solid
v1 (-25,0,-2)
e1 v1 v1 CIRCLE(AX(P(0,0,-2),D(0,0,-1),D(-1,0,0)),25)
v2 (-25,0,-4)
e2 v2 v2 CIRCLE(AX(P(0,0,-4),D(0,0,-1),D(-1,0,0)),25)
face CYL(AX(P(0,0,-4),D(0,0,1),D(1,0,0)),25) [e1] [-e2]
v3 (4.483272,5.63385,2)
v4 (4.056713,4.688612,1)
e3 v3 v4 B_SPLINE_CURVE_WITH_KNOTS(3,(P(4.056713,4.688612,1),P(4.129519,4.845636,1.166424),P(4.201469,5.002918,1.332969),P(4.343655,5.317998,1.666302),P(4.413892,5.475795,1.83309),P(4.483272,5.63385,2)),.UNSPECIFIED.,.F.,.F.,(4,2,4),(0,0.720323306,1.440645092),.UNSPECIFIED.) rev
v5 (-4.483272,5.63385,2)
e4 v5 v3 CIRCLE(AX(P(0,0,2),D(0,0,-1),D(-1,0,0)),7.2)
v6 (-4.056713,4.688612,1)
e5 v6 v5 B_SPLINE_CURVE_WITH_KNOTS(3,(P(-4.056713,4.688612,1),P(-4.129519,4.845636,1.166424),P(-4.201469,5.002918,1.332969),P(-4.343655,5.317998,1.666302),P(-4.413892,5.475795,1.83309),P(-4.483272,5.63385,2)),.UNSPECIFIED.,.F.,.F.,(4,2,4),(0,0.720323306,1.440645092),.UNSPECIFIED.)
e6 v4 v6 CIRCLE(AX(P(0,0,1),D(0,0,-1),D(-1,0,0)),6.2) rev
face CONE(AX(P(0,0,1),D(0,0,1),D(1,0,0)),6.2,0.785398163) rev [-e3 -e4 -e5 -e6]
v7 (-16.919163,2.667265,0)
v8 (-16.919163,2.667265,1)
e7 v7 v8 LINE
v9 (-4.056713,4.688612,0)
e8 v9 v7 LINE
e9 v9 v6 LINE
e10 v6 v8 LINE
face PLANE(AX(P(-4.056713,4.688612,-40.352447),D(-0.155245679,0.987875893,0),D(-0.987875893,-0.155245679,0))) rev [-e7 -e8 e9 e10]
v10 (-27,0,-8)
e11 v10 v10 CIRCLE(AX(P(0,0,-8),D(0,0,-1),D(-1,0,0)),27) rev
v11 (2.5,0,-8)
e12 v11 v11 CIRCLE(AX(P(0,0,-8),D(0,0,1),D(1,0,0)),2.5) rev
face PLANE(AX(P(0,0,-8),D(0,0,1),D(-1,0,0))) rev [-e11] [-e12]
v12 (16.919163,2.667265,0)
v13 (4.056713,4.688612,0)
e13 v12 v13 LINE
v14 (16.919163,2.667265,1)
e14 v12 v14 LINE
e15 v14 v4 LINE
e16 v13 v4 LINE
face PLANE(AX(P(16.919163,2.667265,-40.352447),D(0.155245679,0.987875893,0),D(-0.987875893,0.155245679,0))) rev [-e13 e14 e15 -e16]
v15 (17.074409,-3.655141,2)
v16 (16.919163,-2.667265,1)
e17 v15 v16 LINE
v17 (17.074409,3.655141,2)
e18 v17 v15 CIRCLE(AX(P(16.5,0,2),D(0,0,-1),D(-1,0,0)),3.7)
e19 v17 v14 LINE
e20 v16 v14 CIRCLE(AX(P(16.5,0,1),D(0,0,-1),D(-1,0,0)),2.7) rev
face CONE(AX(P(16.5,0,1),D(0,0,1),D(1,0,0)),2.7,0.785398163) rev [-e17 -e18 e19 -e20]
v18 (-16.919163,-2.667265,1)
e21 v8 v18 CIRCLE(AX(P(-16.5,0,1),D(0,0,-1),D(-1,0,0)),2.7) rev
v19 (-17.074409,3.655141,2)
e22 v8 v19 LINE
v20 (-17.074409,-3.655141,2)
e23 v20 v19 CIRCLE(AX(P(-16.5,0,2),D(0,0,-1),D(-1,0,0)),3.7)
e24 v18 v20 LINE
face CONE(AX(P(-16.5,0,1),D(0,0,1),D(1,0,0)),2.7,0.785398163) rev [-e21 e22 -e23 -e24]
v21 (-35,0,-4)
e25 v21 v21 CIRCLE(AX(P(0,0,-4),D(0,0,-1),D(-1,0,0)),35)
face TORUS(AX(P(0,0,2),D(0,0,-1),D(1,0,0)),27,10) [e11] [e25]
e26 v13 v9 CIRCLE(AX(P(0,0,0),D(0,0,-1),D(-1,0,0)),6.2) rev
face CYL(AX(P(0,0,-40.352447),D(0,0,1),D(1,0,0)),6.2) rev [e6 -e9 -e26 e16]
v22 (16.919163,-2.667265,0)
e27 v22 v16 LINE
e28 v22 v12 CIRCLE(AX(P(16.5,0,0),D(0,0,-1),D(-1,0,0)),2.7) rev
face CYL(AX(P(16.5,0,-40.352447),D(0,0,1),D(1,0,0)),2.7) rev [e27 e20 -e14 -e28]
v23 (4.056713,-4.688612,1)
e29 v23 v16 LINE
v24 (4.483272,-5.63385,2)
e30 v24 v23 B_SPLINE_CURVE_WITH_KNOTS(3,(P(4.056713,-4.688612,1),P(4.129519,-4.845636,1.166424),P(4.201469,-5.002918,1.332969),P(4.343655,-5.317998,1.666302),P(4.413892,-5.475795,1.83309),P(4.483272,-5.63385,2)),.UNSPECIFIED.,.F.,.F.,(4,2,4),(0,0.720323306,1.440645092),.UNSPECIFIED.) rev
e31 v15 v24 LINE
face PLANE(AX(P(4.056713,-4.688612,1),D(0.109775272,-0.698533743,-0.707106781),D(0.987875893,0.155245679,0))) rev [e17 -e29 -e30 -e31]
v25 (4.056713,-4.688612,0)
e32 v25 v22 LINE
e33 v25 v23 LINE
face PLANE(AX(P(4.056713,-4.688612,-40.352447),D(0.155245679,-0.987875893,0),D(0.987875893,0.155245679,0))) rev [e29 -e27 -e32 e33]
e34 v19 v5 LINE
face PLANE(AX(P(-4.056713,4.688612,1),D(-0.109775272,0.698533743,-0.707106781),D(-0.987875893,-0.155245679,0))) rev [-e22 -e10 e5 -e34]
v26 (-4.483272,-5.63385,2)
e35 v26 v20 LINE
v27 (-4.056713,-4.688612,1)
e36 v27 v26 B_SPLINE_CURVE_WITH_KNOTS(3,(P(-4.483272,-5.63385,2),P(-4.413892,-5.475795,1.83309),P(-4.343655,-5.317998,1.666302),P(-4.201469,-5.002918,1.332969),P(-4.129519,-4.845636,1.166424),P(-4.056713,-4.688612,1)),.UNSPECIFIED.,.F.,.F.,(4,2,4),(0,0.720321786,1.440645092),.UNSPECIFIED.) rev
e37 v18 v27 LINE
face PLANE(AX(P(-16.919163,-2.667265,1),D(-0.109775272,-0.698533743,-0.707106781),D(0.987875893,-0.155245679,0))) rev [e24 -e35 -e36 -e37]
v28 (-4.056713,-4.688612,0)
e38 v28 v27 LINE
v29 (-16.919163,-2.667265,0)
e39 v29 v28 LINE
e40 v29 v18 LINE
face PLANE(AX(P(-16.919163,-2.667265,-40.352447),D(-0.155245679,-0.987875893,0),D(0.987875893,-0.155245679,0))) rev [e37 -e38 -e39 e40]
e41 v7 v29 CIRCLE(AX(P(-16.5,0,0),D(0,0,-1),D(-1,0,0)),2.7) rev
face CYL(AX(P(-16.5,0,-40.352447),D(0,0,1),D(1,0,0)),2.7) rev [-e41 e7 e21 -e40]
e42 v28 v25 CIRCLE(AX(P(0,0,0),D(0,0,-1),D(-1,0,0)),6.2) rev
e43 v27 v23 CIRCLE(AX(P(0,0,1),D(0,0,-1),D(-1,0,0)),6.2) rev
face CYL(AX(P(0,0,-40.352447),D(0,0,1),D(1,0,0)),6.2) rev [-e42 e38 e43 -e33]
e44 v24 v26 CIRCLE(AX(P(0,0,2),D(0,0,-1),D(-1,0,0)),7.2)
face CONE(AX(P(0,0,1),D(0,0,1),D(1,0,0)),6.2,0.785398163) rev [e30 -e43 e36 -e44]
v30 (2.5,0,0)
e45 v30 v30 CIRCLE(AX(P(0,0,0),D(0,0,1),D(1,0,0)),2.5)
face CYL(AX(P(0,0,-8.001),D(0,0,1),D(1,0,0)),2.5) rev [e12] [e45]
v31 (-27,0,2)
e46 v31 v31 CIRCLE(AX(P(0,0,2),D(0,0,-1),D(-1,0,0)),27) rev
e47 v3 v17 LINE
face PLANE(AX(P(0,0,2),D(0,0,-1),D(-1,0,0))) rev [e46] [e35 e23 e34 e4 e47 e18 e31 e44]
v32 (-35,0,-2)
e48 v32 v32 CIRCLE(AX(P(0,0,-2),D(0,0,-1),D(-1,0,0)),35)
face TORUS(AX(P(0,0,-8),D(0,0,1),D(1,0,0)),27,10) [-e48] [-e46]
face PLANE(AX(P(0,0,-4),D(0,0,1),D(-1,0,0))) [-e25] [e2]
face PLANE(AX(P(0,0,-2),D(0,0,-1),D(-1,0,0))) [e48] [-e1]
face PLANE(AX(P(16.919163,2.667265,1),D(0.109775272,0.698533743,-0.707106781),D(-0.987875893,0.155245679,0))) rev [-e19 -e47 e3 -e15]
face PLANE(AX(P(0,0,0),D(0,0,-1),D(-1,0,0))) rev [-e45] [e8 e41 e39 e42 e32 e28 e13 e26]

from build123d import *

# Parameters (mm, degrees)
SKETCH_1_R               = 1.5
EXTRUDE_1_DEPTH          = 2.3
SKETCH_2_R               = 4.4
EXTRUDE_2_DEPTH          = 3.2
SKETCH_3_R               = 4.4
SKETCH_3_R_2             = 3.4
SKETCH_3_R_3             = 2.75
SKETCH_3_R_4             = 1.5
CUT_EXTRUDE_1_DEPTH      = 1
BOSS_EXTRUDE1_DEPTH      = 2
BOSS_EXTRUDE1_DEPTH_BACK = 2
SKETCH1_R                = 35
INTERSECT2_OUTLINE_R     = 4.4
INTERSECT2_OUTLINE_R_2   = 3.4
INTERSECT2_OUTLINE_R_3   = 2.75
INTERSECT2_DEPTH         = 5.5
INTERSECT2_START         = 1
INTERSECT2_2_OUTLINE_R   = 4.4
INTERSECT2_2_OUTLINE_R_2 = 3.4
INTERSECT2_2_OUTLINE_R_3 = 2.75
INTERSECT2_2_OUTLINE_R_4 = 1.5
INTERSECT2_2_DEPTH       = 4.5
FILLET1_R                = 10
SKETCH2_R                = 25
BOSS_EXTRUDE2_DEPTH      = 2
SKETCH3_R                = 27
BOSS_EXTRUDE3_DEPTH      = 2
SKETCH4_R                = 6
CUT_EXTRUDE1_DEPTH       = 2
CUT_EXTRUDE3_REACH       = 52.14
SKETCH5_R                = 2.5
CUT_EXTRUDE4_START       = -2
CUT_EXTRUDE4_DEPTH       = 2
CHAMFER1_SIZE            = 1


# Read off the part's stored shape, not the designer's step: Intersect2
with BuildPart() as part:
    # Эскиз1 → Бобышка-Вытянуть1 (new body)
    with BuildSketch(Plane.XY):
        with BuildLine():
            Line((-3.968626967, 4.5), (-16.888114198, 2.469689731))
            ThreePointArc((-16.888114198, 2.469689731), (-19, 0), (-16.888114198, -2.469689731))
            Line((-16.888114198, -2.469689731), (-3.968626967, -4.5))
            ThreePointArc((-3.968626967, -4.5), (0, -6), (3.968626967, -4.5))
            Line((3.968626967, -4.5), (16.888114198, -2.469689731))
            ThreePointArc((16.888114198, -2.469689731), (19, 0), (16.888114198, 2.469689731))
            Line((16.888114198, 2.469689731), (3.968626967, 4.5))
            ThreePointArc((3.968626967, 4.5), (0, 6), (-3.968626967, 4.5))
        make_face()
        Circle(SKETCH_1_R, mode=Mode.SUBTRACT)
    extrude(amount=EXTRUDE_1_DEPTH)

    # Эскиз2 → Бобышка-Вытянуть2 (add)
    with BuildSketch(Plane.XY.offset(2.3)):
        with Locations(Location((0, 0, 0), (0, 0, 180))):
            Circle(SKETCH_2_R)
        Polygon((0.333439775, 2.639447604), (0, 3.05), (-0.333439775, 2.639447604), (-0.758504156, 2.954178641), (-0.979368078, 2.473601404), (-1.469348706, 2.672735374), (-1.563759083, 2.15232973), (-2.087868673, 2.223354314), (-2.049893354, 1.695819264), (-2.575200173, 1.634271725), (-2.407225286, 1.132754236), (-2.900722375, 0.942501833), (-2.6133024, 0.498514094), (-3.043981522, 0.191511085), (-2.655176114, -0.167049522), (-2.995976115, -0.571513009), (-2.530215347, -0.822116802), (-2.75972251, -1.298626839), (-2.246271844, -1.42552746), (-2.35006539, -1.944143169), (-1.821186821, -1.939366985), (-1.792745019, -2.467501833), (-1.281669931, -2.33134895), (-1.122779886, -2.835818282), (-0.661621006, -2.576843686), (-0.382266362, -3.025949839), (0, -2.660425857), (0.382266362, -3.025949839), (0.661621006, -2.576843686), (1.122779886, -2.835818282), (1.281669931, -2.33134895), (1.792745019, -2.467501833), (1.821186821, -1.939366985), (2.35006539, -1.944143169), (2.246271844, -1.42552746), (2.75972251, -1.298626839), (2.530215347, -0.822116802), (2.995976115, -0.571513009), (2.655176114, -0.167049522), (3.043981522, 0.191511085), (2.6133024, 0.498514094), (2.900722375, 0.942501833), (2.407225286, 1.132754236), (2.575200173, 1.634271725), (2.049893354, 1.695819264), (2.087868673, 2.223354314), (1.563759083, 2.15232973), (1.469348706, 2.672735374), (0.979368078, 2.473601404), (0.758504156, 2.954178641), align=None, mode=Mode.SUBTRACT)
    extrude(amount=EXTRUDE_2_DEPTH)

    # Эскиз3 → Вырез-Вытянуть1 (cut)
    # profile 1 of 2: a face of its own
    with BuildSketch(Plane(origin=(0, 0, 0), x_dir=(-1, 0, 0), z_dir=(0, 0, -1))):
        Circle(SKETCH_3_R)
        Circle(SKETCH_3_R_2, mode=Mode.SUBTRACT)
    # profile 2 of 2: a face of its own
    with BuildSketch(Plane(origin=(0, 0, 0), x_dir=(-1, 0, 0), z_dir=(0, 0, -1))):
        Circle(SKETCH_3_R_3)
        Circle(SKETCH_3_R_4, mode=Mode.SUBTRACT)
    extrude(amount=-CUT_EXTRUDE_1_DEPTH, mode=Mode.SUBTRACT)


with BuildPart() as body_2:
    # Sketch1 → Boss-Extrude1 (new, two sides: drawn at the far end of the back side and taken through both)
    with BuildSketch(Plane(origin=(0, 0, 0), x_dir=(-1, 0, 0), z_dir=(0, 0, -1)).offset(-BOSS_EXTRUDE1_DEPTH_BACK)):
        Circle(SKETCH1_R)
    extrude(amount=BOSS_EXTRUDE1_DEPTH + BOSS_EXTRUDE1_DEPTH_BACK)


with BuildPart() as intersect2_tool:
    # Intersect2 outline → Intersect2 (new body)
    # profile 1 of 2: a face of its own
    with BuildSketch(Plane.XY):
        with BuildLine():
            ThreePointArc((3.968626967, 4.5), (0, 6), (-3.968626967, 4.5))
            Line((-3.968626967, 4.5), (-16.888114198, 2.469689731))
            ThreePointArc((-16.888114198, 2.469689731), (-19, 0), (-16.888114198, -2.469689731))
            Line((-16.888114198, -2.469689731), (-3.968626967, -4.5))
            ThreePointArc((-3.968626967, -4.5), (0, -6), (3.968626967, -4.5))
            Line((3.968626967, -4.5), (16.888114198, -2.469689731))
            ThreePointArc((16.888114198, -2.469689731), (19, 0), (16.888114198, 2.469689731))
            Line((16.888114198, 2.469689731), (3.968626967, 4.5))
        make_face()
        Circle(INTERSECT2_OUTLINE_R, mode=Mode.SUBTRACT)
    # profile 2 of 2: a face of its own
    with BuildSketch(Plane.XY):
        Circle(INTERSECT2_OUTLINE_R_2)
        Circle(INTERSECT2_OUTLINE_R_3, mode=Mode.SUBTRACT)
    extrude(amount=INTERSECT2_DEPTH)


with BuildPart() as part_1:
    add(part.part)

    # Intersect2: cut by intersect2_tool
    add(intersect2_tool.part, mode=Mode.SUBTRACT)


with BuildPart() as body_2_1:
    add(body_2.part)

    # Intersect2: cut by intersect2_tool
    add(intersect2_tool.part, mode=Mode.SUBTRACT)


with BuildPart() as intersect2_2_tool:
    # Intersect2 2 outline → Intersect2 2 (new body)
    # profile 1 of 2: a face of its own
    with BuildSketch(Plane.XY.offset(INTERSECT2_START)):
        Circle(INTERSECT2_2_OUTLINE_R)
        Circle(INTERSECT2_2_OUTLINE_R_2, mode=Mode.SUBTRACT)
    # profile 2 of 2: a face of its own
    with BuildSketch(Plane.XY.offset(INTERSECT2_START)):
        Circle(INTERSECT2_2_OUTLINE_R_3)
        Circle(INTERSECT2_2_OUTLINE_R_4, mode=Mode.SUBTRACT)
    extrude(amount=INTERSECT2_2_DEPTH)


with BuildPart() as part_2:
    add(part_1.part)

    # Intersect2 2: cut by intersect2_2_tool
    add(intersect2_2_tool.part, mode=Mode.SUBTRACT)


with BuildPart() as body_2_2:
    add(body_2_1.part)

    # Intersect2 2: cut by intersect2_2_tool
    add(intersect2_2_tool.part, mode=Mode.SUBTRACT)

    # Fillet1
    # the kernel refuses this fillet: 10 mm, written as the material it takes off along each edge
    with BuildSketch(Plane(origin=(0, 0, 2), x_dir=(-1, 0, 0), z_dir=(0, -1, 0))) as fillet1_piece_1:
        with BuildLine():
            CenterArc((27, 10), FILLET1_R, 270, 53.130102354)
            Line((27, 0), (27, -0.2))
            Line((27, -0.2), (35, -0.2))
            Line((35, -0.2), (35.2, 0))
            ThreePointArc((35.2, 0), (35.2, 2), (35.16, 3.88))
            Line((35.16, 3.88), (35, 4))
        make_face()
    revolve(axis=Axis((0, 0, 2), (0, 0, -1)), mode=Mode.SUBTRACT)


with BuildPart() as body_2_2_1:
    # Mirror9: mirrored copy
    add(body_2_2.part.mirror(Plane.XY.offset(-3)))


with BuildPart() as body_2_3:
    add(body_2_2.part)

    add(body_2_2_1.part)  # Boss-Extrude2 merges body 2 2
    # Sketch2 → Boss-Extrude2 (add)
    with BuildSketch(Plane(origin=(0, 0, -2), x_dir=(-1, 0, 0), z_dir=(0, 0, -1))):
        Circle(SKETCH2_R)
    extrude(amount=BOSS_EXTRUDE2_DEPTH)

    # Sketch3 → Boss-Extrude3 (add)
    with BuildSketch(Plane(origin=(0, 0, -8), x_dir=(-1, 0, 0), z_dir=(0, 0, -1))):
        Circle(SKETCH3_R)
    extrude(amount=-BOSS_EXTRUDE3_DEPTH)

    # Sketch4 → Cut-Extrude1 (cut)
    with BuildSketch(Plane.XY):
        Circle(SKETCH4_R)
    extrude(amount=CUT_EXTRUDE1_DEPTH, mode=Mode.SUBTRACT)

    # Sketch5 → Cut-Extrude3 (cut, up to next)
    with BuildSketch(Plane.XY, mode=Mode.PRIVATE) as cut_extrude3_sk1:
        Circle(SKETCH5_R)
    cut_extrude3_tool1 = extrude(cut_extrude3_sk1.sketch, amount=-CUT_EXTRUDE3_REACH, mode=Mode.PRIVATE) & body_2_3.part
    add(cut_extrude3_tool1.solids().sort_by_distance((0, 0, 0))[0], mode=Mode.SUBTRACT)

    # Sketch6 → Cut-Extrude4 (cut)
    with BuildSketch(Plane.XY.offset(2).offset(CUT_EXTRUDE4_START)):
        with BuildLine():
            Line((16.919163334, 2.66726491), (4.056712891, 4.68861179))
            ThreePointArc((4.056712891, 4.68861179), (0, 6.2), (-4.056712891, 4.68861179))
            Line((-4.056712891, 4.68861179), (-16.919163334, 2.66726491))
            ThreePointArc((-16.919163334, 2.66726491), (-19.2, 0), (-16.919163334, -2.66726491))
            Line((-16.919163334, -2.66726491), (-4.056712891, -4.68861179))
            ThreePointArc((-4.056712891, -4.68861179), (0, -6.2), (4.056712891, -4.68861179))
            Line((4.056712891, -4.68861179), (16.919163334, -2.66726491))
            ThreePointArc((16.919163334, -2.66726491), (19.2, 0), (16.919163334, 2.66726491))
        make_face()
    extrude(amount=CUT_EXTRUDE4_DEPTH, mode=Mode.SUBTRACT)

    # Chamfer1
    chamfer1_edges = [body_2_3.edges().sort_by_distance(p)[0] for p in [
        (0, 6.2, 2),
        (-10.487938112, 3.67793835, 2),
        (-19.2, 0, 2),
        (-10.487938112, -3.67793835, 2),
        (0, -6.2, 2),
        (10.487938112, -3.67793835, 2),
        (19.2, 0, 2),
        (10.487938112, 3.67793835, 2),
    ]]
    chamfer(chamfer1_edges, length=CHAMFER1_SIZE)


solid = body_2_3.part
